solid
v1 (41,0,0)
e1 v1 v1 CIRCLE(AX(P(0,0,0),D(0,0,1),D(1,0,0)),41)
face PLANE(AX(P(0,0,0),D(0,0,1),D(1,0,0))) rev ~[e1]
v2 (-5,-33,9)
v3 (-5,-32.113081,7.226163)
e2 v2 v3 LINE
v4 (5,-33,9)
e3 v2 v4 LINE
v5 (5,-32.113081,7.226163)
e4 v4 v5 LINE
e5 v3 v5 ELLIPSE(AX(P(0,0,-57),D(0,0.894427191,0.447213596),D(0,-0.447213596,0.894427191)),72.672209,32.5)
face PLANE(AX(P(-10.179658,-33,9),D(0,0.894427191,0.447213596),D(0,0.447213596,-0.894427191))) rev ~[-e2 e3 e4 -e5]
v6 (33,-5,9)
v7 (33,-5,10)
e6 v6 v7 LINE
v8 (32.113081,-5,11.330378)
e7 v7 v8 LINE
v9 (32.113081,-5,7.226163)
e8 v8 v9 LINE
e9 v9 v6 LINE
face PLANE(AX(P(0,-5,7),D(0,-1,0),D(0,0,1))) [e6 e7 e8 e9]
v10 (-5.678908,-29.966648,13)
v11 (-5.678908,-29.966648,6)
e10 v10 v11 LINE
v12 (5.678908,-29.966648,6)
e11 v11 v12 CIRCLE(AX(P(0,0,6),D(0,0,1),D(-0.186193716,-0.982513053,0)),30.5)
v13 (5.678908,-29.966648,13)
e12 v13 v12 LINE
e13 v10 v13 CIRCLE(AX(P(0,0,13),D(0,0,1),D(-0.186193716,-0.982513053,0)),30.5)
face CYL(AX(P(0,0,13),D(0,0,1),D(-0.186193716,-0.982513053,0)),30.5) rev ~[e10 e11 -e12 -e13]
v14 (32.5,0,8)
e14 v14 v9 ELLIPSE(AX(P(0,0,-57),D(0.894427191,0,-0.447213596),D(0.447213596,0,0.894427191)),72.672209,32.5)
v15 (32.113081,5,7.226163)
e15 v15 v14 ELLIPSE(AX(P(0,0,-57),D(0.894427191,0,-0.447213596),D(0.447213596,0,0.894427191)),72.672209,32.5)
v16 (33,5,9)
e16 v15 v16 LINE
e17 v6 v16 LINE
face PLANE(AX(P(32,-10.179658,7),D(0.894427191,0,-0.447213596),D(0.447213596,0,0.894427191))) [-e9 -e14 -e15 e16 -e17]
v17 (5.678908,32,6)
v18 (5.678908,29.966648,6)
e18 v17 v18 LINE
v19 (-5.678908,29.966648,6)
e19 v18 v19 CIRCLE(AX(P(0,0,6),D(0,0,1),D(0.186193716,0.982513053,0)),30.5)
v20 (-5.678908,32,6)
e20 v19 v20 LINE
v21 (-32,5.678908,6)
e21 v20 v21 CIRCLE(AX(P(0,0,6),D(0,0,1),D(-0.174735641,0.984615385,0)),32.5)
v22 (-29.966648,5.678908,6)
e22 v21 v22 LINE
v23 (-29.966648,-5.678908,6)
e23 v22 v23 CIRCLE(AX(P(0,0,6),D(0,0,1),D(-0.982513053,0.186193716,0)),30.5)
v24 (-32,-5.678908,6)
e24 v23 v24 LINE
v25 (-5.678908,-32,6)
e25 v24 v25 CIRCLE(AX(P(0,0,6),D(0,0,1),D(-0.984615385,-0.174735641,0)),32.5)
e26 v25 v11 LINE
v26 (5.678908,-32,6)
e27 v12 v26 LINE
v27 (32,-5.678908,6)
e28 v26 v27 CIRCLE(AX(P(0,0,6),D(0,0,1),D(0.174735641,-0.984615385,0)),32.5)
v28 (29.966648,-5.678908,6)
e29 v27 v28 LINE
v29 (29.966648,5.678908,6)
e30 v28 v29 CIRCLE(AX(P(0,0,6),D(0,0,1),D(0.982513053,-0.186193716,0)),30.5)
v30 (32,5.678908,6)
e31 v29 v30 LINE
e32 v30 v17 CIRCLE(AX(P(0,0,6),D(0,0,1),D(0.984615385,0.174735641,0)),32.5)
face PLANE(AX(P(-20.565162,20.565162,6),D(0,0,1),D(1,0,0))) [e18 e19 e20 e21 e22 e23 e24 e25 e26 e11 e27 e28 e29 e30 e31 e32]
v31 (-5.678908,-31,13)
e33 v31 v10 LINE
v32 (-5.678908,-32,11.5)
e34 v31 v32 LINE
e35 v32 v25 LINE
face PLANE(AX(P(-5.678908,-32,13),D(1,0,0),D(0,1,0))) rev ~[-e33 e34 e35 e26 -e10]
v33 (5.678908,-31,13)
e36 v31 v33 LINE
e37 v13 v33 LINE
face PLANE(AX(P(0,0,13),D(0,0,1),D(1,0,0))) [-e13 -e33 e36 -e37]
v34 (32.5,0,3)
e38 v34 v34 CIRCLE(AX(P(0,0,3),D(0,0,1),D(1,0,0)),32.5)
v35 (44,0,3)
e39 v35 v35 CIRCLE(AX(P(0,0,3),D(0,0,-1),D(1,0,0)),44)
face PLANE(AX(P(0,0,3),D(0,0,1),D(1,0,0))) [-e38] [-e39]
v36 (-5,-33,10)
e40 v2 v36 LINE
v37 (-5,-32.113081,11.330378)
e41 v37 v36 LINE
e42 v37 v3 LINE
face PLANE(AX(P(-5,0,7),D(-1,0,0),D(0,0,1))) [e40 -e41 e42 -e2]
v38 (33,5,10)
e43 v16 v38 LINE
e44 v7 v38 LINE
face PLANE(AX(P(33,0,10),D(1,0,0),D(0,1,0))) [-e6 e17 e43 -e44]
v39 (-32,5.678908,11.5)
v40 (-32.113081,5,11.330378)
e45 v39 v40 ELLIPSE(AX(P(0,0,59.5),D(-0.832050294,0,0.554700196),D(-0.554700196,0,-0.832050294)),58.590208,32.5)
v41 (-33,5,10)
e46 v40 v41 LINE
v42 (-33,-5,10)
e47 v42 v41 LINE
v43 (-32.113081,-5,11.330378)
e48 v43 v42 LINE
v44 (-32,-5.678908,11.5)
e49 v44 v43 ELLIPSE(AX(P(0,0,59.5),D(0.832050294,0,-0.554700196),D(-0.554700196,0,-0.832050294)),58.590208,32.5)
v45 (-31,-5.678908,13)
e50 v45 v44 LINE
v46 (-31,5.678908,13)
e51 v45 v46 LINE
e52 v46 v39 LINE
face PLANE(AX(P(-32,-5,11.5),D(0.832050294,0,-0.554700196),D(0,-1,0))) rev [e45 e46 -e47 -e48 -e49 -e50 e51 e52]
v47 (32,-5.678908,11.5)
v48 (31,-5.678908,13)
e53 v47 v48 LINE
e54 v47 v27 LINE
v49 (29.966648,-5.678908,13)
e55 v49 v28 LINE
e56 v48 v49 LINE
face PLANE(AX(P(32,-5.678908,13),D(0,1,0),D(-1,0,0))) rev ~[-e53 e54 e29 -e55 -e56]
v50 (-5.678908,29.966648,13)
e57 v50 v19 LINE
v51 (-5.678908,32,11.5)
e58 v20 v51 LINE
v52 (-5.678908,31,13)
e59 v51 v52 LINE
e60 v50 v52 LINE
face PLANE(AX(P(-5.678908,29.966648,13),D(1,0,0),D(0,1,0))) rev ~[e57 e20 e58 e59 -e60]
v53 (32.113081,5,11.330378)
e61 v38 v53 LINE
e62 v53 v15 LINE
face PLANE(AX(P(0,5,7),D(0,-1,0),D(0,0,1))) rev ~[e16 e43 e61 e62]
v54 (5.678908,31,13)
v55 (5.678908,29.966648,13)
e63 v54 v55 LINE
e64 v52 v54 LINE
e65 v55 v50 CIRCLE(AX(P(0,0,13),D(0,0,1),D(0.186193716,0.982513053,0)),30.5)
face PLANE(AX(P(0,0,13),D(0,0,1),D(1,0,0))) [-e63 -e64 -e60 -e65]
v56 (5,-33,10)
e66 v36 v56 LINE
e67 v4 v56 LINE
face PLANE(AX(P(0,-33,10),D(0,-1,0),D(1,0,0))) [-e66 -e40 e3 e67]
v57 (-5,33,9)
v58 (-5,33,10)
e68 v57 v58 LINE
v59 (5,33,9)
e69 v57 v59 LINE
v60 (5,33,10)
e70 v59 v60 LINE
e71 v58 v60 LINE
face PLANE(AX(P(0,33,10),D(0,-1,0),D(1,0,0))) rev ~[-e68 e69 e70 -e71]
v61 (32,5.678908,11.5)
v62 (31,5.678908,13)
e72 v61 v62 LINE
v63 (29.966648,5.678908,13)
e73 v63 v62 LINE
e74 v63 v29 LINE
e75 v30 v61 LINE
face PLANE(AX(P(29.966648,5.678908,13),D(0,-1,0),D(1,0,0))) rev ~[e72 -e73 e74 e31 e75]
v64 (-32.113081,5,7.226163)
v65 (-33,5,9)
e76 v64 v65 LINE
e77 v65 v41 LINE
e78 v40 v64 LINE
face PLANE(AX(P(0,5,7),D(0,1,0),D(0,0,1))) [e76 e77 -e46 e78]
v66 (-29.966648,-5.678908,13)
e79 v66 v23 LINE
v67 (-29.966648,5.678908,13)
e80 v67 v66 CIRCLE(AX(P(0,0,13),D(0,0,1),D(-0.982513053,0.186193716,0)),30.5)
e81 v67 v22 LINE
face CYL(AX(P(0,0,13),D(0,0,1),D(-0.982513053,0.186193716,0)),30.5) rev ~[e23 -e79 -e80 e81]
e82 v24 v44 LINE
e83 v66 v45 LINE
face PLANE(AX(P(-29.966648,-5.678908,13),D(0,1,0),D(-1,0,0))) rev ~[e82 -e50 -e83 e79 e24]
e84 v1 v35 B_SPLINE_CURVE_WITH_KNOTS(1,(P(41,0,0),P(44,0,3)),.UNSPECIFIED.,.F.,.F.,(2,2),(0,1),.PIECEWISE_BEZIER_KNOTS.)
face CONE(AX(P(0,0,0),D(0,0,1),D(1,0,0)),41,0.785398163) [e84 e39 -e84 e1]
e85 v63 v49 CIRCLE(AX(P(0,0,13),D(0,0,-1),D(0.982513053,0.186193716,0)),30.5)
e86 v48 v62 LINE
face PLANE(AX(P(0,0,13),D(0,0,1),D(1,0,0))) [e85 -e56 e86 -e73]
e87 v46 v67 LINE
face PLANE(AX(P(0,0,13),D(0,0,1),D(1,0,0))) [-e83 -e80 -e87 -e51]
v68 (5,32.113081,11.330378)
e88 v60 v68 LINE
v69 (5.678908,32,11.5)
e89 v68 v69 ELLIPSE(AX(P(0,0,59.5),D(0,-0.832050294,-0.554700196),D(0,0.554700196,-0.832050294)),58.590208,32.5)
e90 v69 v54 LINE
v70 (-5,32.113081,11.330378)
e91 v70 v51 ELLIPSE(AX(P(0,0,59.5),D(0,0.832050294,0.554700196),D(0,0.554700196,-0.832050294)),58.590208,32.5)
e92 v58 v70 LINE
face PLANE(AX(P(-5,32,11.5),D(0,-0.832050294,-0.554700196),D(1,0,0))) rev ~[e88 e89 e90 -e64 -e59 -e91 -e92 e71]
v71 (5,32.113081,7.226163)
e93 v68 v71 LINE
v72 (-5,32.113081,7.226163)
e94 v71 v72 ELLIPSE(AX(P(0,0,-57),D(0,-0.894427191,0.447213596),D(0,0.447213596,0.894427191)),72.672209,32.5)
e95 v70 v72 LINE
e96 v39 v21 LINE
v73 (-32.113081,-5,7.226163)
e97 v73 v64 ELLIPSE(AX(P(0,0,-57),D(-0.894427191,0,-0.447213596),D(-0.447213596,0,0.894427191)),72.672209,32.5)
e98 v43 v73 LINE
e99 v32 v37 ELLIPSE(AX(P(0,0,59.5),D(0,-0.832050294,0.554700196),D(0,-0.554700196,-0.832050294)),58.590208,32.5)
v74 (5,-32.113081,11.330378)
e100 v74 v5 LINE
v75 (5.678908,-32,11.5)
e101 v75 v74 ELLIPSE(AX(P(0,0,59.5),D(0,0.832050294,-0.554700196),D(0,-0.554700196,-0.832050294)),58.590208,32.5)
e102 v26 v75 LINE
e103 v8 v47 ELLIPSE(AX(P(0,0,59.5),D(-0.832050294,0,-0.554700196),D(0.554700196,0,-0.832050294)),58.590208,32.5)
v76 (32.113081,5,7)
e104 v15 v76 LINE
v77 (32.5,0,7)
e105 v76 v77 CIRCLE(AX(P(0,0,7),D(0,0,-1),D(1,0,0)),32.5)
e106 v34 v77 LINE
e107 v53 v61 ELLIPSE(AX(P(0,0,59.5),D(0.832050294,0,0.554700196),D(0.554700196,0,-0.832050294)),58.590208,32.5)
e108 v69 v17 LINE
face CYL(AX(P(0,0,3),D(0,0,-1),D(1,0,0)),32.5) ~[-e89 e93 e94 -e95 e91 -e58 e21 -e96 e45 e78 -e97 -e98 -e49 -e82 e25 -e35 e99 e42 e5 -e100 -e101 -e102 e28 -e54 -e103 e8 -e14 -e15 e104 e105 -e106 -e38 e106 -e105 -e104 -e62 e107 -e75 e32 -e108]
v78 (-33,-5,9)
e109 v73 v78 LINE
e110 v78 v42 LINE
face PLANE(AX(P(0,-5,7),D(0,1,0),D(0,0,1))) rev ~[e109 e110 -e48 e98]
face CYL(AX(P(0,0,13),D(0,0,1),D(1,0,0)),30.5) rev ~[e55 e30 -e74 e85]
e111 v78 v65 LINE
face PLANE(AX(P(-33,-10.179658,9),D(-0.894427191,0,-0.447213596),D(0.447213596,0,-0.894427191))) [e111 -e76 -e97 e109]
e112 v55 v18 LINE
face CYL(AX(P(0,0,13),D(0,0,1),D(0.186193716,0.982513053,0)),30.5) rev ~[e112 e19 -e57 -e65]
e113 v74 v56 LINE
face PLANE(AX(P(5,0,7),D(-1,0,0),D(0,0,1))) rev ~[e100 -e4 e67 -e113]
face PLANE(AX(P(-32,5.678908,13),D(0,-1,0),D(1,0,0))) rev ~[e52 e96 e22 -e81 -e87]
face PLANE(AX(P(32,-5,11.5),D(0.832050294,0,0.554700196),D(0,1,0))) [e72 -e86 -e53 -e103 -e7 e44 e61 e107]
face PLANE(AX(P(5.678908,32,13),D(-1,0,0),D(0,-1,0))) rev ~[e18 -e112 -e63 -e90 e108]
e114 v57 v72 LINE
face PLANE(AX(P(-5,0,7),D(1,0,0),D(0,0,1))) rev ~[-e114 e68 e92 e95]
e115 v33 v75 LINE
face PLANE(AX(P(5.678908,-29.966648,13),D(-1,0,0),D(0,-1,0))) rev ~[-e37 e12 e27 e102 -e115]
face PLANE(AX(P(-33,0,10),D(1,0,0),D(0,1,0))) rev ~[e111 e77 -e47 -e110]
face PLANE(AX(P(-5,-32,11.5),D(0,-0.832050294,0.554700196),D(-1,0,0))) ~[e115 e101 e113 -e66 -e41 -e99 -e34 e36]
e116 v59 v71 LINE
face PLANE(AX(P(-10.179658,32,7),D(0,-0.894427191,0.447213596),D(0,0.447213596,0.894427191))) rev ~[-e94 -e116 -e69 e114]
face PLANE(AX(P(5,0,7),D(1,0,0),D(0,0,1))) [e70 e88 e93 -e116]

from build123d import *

# Parameters (mm, degrees)
F0_R          = 41
F1_DEPTH      = 3
F1_TAPER      = -45
F2_R          = 32.5
F3_DEPTH      = 10
F4_W          = 10
F4_H          = 6
F6_DEPTH      = 33
F6_DEPTH_BACK = 33
F7_W          = 10
F7_H          = 6
F8_DEPTH      = 33
F8_DEPTH_BACK = 33
F5_R          = 30.5
F9_DEPTH      = 7
F12_DEPTH     = 7
F13_SIZE2     = 2
F13_SIZE      = 3
F13_2_SIZE2   = 2
F13_2_SIZE    = 3
F14_SIZE2     = 3
F14_SIZE      = 2
F14_2_SIZE2   = 3
F14_2_SIZE    = 2
F15_T4_DEPTH  = 20.3593154951
F15_S5_R      = 32.5
F15_T6_DEPTH  = 12
F15_T10_DEPTH = 20.3593154951
F15_S11_R     = 32.5
F15_T12_DEPTH = 12
F16_T4_DEPTH  = 20.3593154951
F16_S5_R      = 32.5
F16_T6_DEPTH  = 12
F16_T10_DEPTH = 20.3593154951
F16_S11_R     = 32.5
F16_T12_DEPTH = 12


# Not quite as in the source:
# - a fillet or chamfer that OpenCascade refuses, or shapes differently, is made with other operations: its cross-section is extruded or revolved along the edge and cut away or added


with BuildPart() as f1:
    # F0 (on Top) → F1 (new body)
    with BuildSketch(Plane.XY):
        Circle(F0_R)
    extrude(amount=F1_DEPTH, taper=F1_TAPER)

    # F2 (on face) → F3 (join)
    with BuildSketch(Plane.XY.offset(3)):
        Circle(F2_R)
    extrude(amount=F3_DEPTH)

    # F4 (on Front) → F6 (join, two sides)
    with BuildSketch(Plane.XZ) as f6_sk:
        with Locations((0, 10)):
            Rectangle(F4_W, F4_H)
    extrude(amount=F6_DEPTH)
    extrude(f6_sk.sketch, amount=-F6_DEPTH_BACK)

    # F7 (on Right) → F8 (join, two sides)
    with BuildSketch(Plane.YZ) as f8_sk:
        with Locations((0, 10)):
            Rectangle(F7_W, F7_H)
    extrude(amount=F8_DEPTH)
    extrude(f8_sk.sketch, amount=-F8_DEPTH_BACK)

    # F5 (on face) → F9 (cut)
    with BuildSketch(Plane.XY.offset(13)):
        Circle(F5_R)
    extrude(amount=-F9_DEPTH, mode=Mode.SUBTRACT)

    # F11 (on face) → F12 (cut)
    with BuildSketch(Plane.XY.offset(13)):
        with BuildLine():
            ThreePointArc((-5.6789083458, 32), (-22.9809703886, 22.9809703886), (-32, 5.6789083458))
            Line((-32, 5.6789083458), (-29.9666481275, 5.6789083458))
            ThreePointArc((-29.9666481275, 5.6789083458), (-21.5667568262, 21.5667568262), (-5.6789083458, 29.9666481275))
            Line((-5.6789083458, 29.9666481275), (-5.6789083458, 32))
        make_face()
        with BuildLine():
            ThreePointArc((-5.6789083458, 29.9666481275), (-21.5667568262, 21.5667568262), (-29.9666481275, 5.6789083458))
            ThreePointArc((-29.9666481275, 5.6789083458), (-30.5, 0), (-29.9666481275, -5.6789083458))
            ThreePointArc((-29.9666481275, -5.6789083458), (-21.5667568262, -21.5667568262), (-5.6789083458, -29.9666481275))
            ThreePointArc((-5.6789083458, -29.9666481275), (0, -30.5), (5.6789083458, -29.9666481275))
            ThreePointArc((5.6789083458, -29.9666481275), (21.5667568262, -21.5667568262), (29.9666481275, -5.6789083458))
            ThreePointArc((29.9666481275, -5.6789083458), (30.3663692915, -2.8519495183), (30.5, 0))
            ThreePointArc((30.5, 0), (30.3663692915, 2.8519495183), (29.9666481275, 5.6789083458))
            ThreePointArc((29.9666481275, 5.6789083458), (21.5667568262, 21.5667568262), (5.6789083458, 29.9666481275))
            ThreePointArc((5.6789083458, 29.9666481275), (0, 30.5), (-5.6789083458, 29.9666481275))
        make_face()
        with BuildLine():
            Line((5.6789083458, 32), (5.6789083458, 29.9666481275))
            ThreePointArc((5.6789083458, 29.9666481275), (21.5667568262, 21.5667568262), (29.9666481275, 5.6789083458))
            Line((29.9666481275, 5.6789083458), (32, 5.6789083458))
            ThreePointArc((32, 5.6789083458), (22.9809703886, 22.9809703886), (5.6789083458, 32))
        make_face()
        with BuildLine():
            ThreePointArc((29.9666481275, -5.6789083458), (21.5667568262, -21.5667568262), (5.6789083458, -29.9666481275))
            Line((5.6789083458, -29.9666481275), (5.6789083458, -32))
            ThreePointArc((5.6789083458, -32), (22.9809703886, -22.9809703886), (32, -5.6789083458))
            Line((32, -5.6789083458), (29.9666481275, -5.6789083458))
        make_face()
        with BuildLine():
            ThreePointArc((-5.6789083458, -29.9666481275), (-21.5667568262, -21.5667568262), (-29.9666481275, -5.6789083458))
            Line((-29.9666481275, -5.6789083458), (-32, -5.6789083458))
            ThreePointArc((-32, -5.6789083458), (-22.9809703886, -22.9809703886), (-5.6789083458, -32))
            Line((-5.6789083458, -32), (-5.6789083458, -29.9666481275))
        make_face()
    extrude(amount=-F12_DEPTH, mode=Mode.SUBTRACT)

    # F13
    f13_edges = [f1.edges().sort_by_distance(p)[0] for p in [
        (0, 33, 13),
    ]]
    f13_side = f1.faces().sort_by_distance((0, 33, 10))[0]
    chamfer(f13_edges, length=F13_SIZE, length2=F13_SIZE2, reference=f13_side)

    # F13#2
    f13_2_edges = [f1.edges().sort_by_distance(p)[0] for p in [
        (33, 0, 13),
    ]]
    f13_2_side = f1.faces().sort_by_distance((33, 0, 10))[0]
    chamfer(f13_2_edges, length=F13_2_SIZE, length2=F13_2_SIZE2, reference=f13_2_side)

    # F14
    f14_edges = [f1.edges().sort_by_distance(p)[0] for p in [
        (0, -33, 13),
    ]]
    f14_side = f1.faces().sort_by_distance((0, -31.618427, 13))[0]
    chamfer(f14_edges, length=F14_SIZE, length2=F14_SIZE2, reference=f14_side)

    # F14#2
    f14_2_edges = [f1.edges().sort_by_distance(p)[0] for p in [
        (-33, 0, 13),
    ]]
    f14_2_side = f1.faces().sort_by_distance((-31.618427, 0, 13))[0]
    chamfer(f14_2_edges, length=F14_2_SIZE, length2=F14_2_SIZE2, reference=f14_2_side)

    # F15: chamfer of 1 x 2 on 2 edges, made by hand


with BuildPart() as f15_tool2:
    # F15_s3 → F15_t4 (new body)
    with BuildSketch(Plane.XZ.offset(10.1796577476)):
        Polygon((32, 7), (33, 9), (33, 7), align=None)
    extrude(amount=-F15_T4_DEPTH)

    # F15_s5 → F15_t6 (cut, symmetric)
    with BuildSketch(Plane.XY.offset(8)):
        Circle(F15_S5_R)
    extrude(amount=F15_T6_DEPTH, both=True, mode=Mode.SUBTRACT)


with BuildPart() as f1_1:
    add(f1.part)

    # F15_t1: cut F15_tool2
    add(f15_tool2.part, mode=Mode.SUBTRACT)


with BuildPart() as f15_tool8:
    # F15_s9 → F15_t10 (new body)
    with BuildSketch(Plane.YZ.offset(-10.1796577476)):
        Polygon((32, 7), (33, 9), (33, 7), align=None)
    extrude(amount=F15_T10_DEPTH)

    # F15_s11 → F15_t12 (cut, symmetric)
    with BuildSketch(Plane.XY.offset(8)):
        Circle(F15_S11_R)
    extrude(amount=F15_T12_DEPTH, both=True, mode=Mode.SUBTRACT)


with BuildPart() as f1_2:
    add(f1_1.part)

    # F15_t7: cut F15_tool8
    add(f15_tool8.part, mode=Mode.SUBTRACT)

    # F16: chamfer of 2 x 1 on 2 edges, made by hand


with BuildPart() as f16_tool2:
    # F16_s3 → F16_t4 (new body)
    with BuildSketch(Plane.YZ.offset(-10.1796577476)):
        Polygon((-33, 9), (-32, 7), (-33, 7), align=None)
    extrude(amount=F16_T4_DEPTH)

    # F16_s5 → F16_t6 (cut, symmetric)
    with BuildSketch(Plane.XY.offset(8)):
        Circle(F16_S5_R)
    extrude(amount=F16_T6_DEPTH, both=True, mode=Mode.SUBTRACT)


with BuildPart() as f1_3:
    add(f1_2.part)

    # F16_t1: cut F16_tool2
    add(f16_tool2.part, mode=Mode.SUBTRACT)


with BuildPart() as f16_tool8:
    # F16_s9 → F16_t10 (new body)
    with BuildSketch(Plane.XZ.offset(10.1796577476)):
        Polygon((-33, 9), (-32, 7), (-33, 7), align=None)
    extrude(amount=-F16_T10_DEPTH)

    # F16_s11 → F16_t12 (cut, symmetric)
    with BuildSketch(Plane.XY.offset(8)):
        Circle(F16_S11_R)
    extrude(amount=F16_T12_DEPTH, both=True, mode=Mode.SUBTRACT)


with BuildPart() as f1_4:
    add(f1_3.part)

    # F16_t7: cut F16_tool8
    add(f16_tool8.part, mode=Mode.SUBTRACT)


solid = f1_4.part
